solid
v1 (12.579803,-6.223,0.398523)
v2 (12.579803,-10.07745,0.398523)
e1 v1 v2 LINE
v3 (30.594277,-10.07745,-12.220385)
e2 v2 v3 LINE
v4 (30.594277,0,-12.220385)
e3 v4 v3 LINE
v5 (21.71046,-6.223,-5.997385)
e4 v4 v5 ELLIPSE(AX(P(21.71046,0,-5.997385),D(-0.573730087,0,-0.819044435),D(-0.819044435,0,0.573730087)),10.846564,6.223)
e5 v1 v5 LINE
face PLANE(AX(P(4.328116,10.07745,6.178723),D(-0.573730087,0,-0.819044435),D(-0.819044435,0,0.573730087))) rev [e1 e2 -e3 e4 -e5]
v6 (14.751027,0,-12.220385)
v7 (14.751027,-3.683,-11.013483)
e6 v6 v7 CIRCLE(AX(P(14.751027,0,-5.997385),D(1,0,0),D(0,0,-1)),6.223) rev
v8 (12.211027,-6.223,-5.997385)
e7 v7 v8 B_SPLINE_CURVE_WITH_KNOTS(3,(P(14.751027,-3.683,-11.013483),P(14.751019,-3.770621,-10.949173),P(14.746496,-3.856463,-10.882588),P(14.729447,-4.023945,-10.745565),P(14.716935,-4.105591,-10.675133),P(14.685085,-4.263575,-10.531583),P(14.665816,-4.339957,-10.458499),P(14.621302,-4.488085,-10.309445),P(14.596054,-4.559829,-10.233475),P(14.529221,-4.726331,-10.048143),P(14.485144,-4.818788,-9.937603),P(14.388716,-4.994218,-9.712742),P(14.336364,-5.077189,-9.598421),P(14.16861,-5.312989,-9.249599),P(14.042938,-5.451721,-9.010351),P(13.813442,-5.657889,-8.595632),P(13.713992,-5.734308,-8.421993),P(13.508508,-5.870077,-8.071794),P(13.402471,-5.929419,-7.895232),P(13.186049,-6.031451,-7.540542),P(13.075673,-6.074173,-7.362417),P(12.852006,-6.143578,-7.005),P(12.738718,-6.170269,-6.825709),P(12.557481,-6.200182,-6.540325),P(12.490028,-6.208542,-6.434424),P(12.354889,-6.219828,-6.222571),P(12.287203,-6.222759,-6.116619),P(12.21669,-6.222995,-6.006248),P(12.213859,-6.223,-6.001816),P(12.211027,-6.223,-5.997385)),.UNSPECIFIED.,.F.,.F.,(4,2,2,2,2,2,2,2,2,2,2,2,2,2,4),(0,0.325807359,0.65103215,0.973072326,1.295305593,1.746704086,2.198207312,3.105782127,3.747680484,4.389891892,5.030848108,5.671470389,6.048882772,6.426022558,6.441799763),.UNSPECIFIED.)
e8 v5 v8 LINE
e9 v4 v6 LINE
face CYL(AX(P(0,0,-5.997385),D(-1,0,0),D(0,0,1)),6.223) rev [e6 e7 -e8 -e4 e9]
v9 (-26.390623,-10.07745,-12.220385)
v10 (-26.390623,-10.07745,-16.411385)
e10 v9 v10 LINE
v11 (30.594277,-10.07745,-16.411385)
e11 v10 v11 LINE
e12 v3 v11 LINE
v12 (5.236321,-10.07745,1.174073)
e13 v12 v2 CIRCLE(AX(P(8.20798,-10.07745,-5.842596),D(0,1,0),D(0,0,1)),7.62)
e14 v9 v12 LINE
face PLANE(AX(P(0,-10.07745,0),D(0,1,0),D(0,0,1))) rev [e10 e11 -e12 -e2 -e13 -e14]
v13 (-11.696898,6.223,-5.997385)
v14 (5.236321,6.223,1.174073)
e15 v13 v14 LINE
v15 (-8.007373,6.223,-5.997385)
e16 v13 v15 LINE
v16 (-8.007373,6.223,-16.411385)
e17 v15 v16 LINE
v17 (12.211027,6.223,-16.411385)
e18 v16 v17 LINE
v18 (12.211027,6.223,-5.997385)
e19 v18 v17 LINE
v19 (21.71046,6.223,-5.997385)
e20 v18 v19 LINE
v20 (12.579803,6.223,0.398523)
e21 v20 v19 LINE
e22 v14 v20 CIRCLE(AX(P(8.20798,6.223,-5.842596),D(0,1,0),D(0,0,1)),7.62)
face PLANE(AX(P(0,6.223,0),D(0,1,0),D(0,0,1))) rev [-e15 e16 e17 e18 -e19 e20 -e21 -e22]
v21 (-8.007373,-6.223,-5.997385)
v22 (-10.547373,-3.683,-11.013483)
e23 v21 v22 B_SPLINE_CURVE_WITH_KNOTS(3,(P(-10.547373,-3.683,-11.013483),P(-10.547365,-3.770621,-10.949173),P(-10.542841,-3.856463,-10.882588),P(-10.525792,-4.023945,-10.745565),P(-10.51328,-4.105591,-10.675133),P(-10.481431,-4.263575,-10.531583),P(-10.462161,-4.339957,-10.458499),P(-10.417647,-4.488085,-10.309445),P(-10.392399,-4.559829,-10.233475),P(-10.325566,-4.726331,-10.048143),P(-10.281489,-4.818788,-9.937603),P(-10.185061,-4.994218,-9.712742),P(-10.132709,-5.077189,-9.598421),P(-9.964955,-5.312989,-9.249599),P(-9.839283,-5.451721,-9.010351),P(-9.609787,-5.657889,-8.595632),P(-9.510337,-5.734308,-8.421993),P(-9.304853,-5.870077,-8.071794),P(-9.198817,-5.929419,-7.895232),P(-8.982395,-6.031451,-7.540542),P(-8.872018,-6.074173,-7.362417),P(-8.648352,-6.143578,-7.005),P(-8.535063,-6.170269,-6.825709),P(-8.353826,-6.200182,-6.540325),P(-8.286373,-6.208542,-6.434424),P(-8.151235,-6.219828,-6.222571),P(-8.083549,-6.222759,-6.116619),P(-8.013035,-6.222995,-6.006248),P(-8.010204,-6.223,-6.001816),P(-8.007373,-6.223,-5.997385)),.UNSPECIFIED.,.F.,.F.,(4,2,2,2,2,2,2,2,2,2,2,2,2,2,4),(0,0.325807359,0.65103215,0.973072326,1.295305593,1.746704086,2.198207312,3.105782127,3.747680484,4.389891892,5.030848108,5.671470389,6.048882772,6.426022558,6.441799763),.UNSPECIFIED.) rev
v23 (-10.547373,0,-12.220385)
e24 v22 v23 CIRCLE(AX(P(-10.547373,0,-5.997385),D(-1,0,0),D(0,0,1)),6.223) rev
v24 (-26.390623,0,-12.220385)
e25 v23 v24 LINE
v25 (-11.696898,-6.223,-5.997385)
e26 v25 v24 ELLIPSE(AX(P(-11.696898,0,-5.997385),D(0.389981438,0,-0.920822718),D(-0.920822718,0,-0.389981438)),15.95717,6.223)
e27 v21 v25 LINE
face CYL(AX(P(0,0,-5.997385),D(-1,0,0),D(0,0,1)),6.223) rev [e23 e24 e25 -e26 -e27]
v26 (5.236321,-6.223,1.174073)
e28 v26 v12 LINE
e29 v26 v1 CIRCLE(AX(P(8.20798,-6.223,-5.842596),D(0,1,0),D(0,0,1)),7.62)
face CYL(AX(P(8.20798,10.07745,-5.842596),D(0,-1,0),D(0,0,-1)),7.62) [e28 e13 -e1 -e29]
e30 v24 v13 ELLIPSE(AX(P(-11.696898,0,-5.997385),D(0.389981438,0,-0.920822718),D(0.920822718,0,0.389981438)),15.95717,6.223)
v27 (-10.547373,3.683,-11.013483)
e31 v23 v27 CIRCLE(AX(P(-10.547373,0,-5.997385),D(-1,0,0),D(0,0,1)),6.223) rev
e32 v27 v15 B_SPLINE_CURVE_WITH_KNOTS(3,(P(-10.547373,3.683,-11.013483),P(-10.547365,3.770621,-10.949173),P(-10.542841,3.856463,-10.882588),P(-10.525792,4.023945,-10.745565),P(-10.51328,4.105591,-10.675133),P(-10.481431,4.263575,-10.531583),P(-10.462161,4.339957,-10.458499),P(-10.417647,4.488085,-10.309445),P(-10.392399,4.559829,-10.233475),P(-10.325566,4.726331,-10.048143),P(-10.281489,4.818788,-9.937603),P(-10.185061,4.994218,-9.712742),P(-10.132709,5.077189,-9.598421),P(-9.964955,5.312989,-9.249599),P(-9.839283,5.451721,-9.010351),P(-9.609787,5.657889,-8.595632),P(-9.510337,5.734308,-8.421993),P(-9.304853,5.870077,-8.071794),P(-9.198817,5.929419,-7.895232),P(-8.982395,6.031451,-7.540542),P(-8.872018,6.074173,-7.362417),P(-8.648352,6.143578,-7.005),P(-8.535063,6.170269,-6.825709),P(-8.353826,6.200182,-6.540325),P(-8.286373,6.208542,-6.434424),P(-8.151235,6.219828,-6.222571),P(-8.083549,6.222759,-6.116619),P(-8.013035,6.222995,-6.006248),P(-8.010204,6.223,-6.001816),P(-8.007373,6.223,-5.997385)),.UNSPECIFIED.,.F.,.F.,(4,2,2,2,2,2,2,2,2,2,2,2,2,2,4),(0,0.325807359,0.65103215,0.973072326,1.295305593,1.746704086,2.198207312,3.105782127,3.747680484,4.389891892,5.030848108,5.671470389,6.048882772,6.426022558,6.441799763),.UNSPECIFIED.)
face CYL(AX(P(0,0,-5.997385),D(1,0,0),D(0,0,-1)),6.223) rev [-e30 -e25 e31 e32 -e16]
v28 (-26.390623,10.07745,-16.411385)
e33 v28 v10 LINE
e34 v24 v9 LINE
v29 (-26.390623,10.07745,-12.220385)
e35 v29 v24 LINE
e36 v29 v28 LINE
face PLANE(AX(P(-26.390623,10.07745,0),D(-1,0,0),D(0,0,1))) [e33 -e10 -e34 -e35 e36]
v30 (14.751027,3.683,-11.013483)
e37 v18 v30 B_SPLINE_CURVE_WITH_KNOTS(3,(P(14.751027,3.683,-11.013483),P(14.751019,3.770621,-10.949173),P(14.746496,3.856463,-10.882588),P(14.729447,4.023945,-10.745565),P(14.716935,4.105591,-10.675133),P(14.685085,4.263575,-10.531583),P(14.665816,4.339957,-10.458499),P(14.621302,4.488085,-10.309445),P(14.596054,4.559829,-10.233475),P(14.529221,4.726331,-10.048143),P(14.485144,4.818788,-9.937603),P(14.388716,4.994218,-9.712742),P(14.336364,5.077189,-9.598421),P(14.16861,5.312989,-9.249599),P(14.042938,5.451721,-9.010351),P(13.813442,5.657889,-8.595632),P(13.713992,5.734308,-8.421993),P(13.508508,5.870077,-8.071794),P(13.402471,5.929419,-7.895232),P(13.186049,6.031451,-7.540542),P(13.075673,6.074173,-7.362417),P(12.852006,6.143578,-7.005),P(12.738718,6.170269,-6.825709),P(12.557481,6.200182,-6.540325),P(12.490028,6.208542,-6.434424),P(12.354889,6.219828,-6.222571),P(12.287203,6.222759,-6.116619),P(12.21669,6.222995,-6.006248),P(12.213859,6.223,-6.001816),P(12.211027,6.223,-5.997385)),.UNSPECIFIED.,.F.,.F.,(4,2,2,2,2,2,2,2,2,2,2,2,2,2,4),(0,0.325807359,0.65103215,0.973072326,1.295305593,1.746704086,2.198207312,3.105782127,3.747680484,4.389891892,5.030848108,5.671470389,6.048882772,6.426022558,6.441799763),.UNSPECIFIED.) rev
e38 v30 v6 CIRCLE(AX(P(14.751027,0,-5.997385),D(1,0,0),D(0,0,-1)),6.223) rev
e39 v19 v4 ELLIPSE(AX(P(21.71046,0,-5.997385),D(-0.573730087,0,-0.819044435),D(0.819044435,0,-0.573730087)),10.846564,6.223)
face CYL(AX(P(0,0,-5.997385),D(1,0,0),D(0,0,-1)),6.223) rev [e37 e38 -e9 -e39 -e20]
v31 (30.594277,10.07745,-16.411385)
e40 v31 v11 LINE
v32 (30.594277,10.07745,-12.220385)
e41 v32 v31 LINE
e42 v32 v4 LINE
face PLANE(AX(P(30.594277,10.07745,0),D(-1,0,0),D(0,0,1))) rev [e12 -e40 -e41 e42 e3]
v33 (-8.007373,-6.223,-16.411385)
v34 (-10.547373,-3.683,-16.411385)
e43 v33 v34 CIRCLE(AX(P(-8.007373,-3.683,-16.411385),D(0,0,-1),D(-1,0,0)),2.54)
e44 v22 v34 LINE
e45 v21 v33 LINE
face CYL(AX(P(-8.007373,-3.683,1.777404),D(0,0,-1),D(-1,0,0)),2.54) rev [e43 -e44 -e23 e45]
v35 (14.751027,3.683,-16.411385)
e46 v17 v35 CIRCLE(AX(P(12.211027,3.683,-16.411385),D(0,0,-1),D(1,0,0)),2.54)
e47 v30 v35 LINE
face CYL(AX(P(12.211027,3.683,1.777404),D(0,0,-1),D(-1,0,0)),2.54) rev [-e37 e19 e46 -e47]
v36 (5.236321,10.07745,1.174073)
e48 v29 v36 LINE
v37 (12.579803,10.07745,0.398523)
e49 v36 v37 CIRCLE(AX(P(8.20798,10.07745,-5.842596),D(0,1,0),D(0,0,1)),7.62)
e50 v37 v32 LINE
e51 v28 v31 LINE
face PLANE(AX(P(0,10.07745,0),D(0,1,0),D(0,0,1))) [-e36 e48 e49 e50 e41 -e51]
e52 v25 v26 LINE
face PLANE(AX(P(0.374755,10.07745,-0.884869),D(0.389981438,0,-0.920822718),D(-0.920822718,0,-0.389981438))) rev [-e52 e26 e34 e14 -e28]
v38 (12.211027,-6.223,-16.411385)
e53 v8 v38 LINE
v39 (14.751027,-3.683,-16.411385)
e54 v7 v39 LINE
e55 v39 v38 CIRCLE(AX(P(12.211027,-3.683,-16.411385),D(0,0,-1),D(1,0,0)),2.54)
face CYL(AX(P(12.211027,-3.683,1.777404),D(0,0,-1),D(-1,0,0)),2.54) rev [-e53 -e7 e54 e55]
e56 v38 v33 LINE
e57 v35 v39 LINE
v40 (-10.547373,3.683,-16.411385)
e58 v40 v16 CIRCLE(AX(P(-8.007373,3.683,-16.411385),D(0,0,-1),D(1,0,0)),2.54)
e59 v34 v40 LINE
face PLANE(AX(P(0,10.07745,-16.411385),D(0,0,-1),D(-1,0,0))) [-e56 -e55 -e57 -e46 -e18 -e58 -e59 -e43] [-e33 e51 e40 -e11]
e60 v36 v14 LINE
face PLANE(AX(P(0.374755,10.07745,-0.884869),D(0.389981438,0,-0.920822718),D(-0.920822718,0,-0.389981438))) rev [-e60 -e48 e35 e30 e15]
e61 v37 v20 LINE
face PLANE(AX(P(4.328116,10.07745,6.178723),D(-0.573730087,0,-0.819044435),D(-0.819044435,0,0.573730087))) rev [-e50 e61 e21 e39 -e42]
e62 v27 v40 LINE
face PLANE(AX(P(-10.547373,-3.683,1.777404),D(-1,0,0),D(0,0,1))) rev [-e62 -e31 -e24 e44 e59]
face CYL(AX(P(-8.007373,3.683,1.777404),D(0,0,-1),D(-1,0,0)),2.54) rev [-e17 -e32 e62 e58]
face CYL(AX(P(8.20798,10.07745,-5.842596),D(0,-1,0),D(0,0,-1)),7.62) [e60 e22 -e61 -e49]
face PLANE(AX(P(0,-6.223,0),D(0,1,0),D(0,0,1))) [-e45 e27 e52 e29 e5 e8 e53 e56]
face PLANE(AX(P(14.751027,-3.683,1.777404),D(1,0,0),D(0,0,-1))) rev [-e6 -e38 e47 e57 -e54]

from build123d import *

# Parameters (mm, degrees)
SKETCH1_W           = 56.9849
SKETCH1_H           = 4.191
BOSS_EXTRUDE2_DEPTH = 10.07745
CUT_EXTRUDE2_DEPTH  = 6.223
FILLET8_R           = 6.223
CUT_EXTRUDE5_DEPTH  = 37.991848321


with BuildPart() as part:
    # Sketch1 → Boss-Extrude2 (new, symmetric)
    with BuildSketch(Plane(origin=(0, 0, 0), x_dir=(1, 0, 0), z_dir=(0, 1, 0))):
        with Locations((2.101827362, 14.315884605)):
            Rectangle(SKETCH1_W, SKETCH1_H)
        with BuildLine():
            Line((-26.390622638, 12.220384605), (5.236321347, -1.174073262))
            ThreePointArc((5.236321347, -1.174073262), (9.008282942, -1.735261042), (12.579803169, -0.398522749))
            Line((12.579803169, -0.398522749), (30.594277362, 12.220384605))
            Line((30.594277362, 12.220384605), (-26.390622638, 12.220384605))
        make_face()
    extrude(amount=BOSS_EXTRUDE2_DEPTH, both=True)

    # Sketch1<16> → Cut-Extrude2 (cut, symmetric)
    with BuildSketch(Plane(origin=(0, 0, 0), x_dir=(1, 0, 0), z_dir=(0, 1, 0))):
        with BuildLine():
            Line((-26.390622638, 12.220384605), (5.236321347, -1.174073262))
            ThreePointArc((5.236321347, -1.174073262), (9.008282942, -1.735261042), (12.579803169, -0.398522749))
            Line((12.579803169, -0.398522749), (30.594277362, 12.220384605))
            Line((30.594277362, 12.220384605), (-26.390622638, 12.220384605))
        make_face()
    extrude(amount=CUT_EXTRUDE2_DEPTH, both=True, mode=Mode.SUBTRACT)

    # Fillet8
    fillet8_edges = [part.edges().sort_by_distance(p)[0] for p in [
        (2.101827362, 6.223, -12.220384605),
        (2.101827362, -6.223, -12.220384605),
    ]]
    fillet(fillet8_edges, radius=FILLET8_R - 0.0001)  # a hair under: the kernel refuses the full size

    # Sketch3 → Cut-Extrude5 (cut, through all)
    with BuildSketch(Plane(origin=(0, 0, -16.411384605), x_dir=(-1, 0, 0), z_dir=(0, 0, -1))):
        with BuildLine():
            Line((-12.211027362, -6.223), (8.007372638, -6.223))
            ThreePointArc((8.007372638, -6.223), (9.803423862, -5.479051224), (10.547372638, -3.683))
            Line((10.547372638, -3.683), (10.547372638, 3.683))
            ThreePointArc((10.547372638, 3.683), (9.803423862, 5.479051224), (8.007372638, 6.223))
            Line((8.007372638, 6.223), (-12.211027362, 6.223))
            ThreePointArc((-12.211027362, 6.223), (-14.007078586, 5.479051224), (-14.751027362, 3.683))
            Line((-14.751027362, 3.683), (-14.751027362, -3.683))
            ThreePointArc((-14.751027362, -3.683), (-14.007078586, -5.479051224), (-12.211027362, -6.223))
        make_face()
    extrude(amount=-CUT_EXTRUDE5_DEPTH, mode=Mode.SUBTRACT)


solid = part.part
